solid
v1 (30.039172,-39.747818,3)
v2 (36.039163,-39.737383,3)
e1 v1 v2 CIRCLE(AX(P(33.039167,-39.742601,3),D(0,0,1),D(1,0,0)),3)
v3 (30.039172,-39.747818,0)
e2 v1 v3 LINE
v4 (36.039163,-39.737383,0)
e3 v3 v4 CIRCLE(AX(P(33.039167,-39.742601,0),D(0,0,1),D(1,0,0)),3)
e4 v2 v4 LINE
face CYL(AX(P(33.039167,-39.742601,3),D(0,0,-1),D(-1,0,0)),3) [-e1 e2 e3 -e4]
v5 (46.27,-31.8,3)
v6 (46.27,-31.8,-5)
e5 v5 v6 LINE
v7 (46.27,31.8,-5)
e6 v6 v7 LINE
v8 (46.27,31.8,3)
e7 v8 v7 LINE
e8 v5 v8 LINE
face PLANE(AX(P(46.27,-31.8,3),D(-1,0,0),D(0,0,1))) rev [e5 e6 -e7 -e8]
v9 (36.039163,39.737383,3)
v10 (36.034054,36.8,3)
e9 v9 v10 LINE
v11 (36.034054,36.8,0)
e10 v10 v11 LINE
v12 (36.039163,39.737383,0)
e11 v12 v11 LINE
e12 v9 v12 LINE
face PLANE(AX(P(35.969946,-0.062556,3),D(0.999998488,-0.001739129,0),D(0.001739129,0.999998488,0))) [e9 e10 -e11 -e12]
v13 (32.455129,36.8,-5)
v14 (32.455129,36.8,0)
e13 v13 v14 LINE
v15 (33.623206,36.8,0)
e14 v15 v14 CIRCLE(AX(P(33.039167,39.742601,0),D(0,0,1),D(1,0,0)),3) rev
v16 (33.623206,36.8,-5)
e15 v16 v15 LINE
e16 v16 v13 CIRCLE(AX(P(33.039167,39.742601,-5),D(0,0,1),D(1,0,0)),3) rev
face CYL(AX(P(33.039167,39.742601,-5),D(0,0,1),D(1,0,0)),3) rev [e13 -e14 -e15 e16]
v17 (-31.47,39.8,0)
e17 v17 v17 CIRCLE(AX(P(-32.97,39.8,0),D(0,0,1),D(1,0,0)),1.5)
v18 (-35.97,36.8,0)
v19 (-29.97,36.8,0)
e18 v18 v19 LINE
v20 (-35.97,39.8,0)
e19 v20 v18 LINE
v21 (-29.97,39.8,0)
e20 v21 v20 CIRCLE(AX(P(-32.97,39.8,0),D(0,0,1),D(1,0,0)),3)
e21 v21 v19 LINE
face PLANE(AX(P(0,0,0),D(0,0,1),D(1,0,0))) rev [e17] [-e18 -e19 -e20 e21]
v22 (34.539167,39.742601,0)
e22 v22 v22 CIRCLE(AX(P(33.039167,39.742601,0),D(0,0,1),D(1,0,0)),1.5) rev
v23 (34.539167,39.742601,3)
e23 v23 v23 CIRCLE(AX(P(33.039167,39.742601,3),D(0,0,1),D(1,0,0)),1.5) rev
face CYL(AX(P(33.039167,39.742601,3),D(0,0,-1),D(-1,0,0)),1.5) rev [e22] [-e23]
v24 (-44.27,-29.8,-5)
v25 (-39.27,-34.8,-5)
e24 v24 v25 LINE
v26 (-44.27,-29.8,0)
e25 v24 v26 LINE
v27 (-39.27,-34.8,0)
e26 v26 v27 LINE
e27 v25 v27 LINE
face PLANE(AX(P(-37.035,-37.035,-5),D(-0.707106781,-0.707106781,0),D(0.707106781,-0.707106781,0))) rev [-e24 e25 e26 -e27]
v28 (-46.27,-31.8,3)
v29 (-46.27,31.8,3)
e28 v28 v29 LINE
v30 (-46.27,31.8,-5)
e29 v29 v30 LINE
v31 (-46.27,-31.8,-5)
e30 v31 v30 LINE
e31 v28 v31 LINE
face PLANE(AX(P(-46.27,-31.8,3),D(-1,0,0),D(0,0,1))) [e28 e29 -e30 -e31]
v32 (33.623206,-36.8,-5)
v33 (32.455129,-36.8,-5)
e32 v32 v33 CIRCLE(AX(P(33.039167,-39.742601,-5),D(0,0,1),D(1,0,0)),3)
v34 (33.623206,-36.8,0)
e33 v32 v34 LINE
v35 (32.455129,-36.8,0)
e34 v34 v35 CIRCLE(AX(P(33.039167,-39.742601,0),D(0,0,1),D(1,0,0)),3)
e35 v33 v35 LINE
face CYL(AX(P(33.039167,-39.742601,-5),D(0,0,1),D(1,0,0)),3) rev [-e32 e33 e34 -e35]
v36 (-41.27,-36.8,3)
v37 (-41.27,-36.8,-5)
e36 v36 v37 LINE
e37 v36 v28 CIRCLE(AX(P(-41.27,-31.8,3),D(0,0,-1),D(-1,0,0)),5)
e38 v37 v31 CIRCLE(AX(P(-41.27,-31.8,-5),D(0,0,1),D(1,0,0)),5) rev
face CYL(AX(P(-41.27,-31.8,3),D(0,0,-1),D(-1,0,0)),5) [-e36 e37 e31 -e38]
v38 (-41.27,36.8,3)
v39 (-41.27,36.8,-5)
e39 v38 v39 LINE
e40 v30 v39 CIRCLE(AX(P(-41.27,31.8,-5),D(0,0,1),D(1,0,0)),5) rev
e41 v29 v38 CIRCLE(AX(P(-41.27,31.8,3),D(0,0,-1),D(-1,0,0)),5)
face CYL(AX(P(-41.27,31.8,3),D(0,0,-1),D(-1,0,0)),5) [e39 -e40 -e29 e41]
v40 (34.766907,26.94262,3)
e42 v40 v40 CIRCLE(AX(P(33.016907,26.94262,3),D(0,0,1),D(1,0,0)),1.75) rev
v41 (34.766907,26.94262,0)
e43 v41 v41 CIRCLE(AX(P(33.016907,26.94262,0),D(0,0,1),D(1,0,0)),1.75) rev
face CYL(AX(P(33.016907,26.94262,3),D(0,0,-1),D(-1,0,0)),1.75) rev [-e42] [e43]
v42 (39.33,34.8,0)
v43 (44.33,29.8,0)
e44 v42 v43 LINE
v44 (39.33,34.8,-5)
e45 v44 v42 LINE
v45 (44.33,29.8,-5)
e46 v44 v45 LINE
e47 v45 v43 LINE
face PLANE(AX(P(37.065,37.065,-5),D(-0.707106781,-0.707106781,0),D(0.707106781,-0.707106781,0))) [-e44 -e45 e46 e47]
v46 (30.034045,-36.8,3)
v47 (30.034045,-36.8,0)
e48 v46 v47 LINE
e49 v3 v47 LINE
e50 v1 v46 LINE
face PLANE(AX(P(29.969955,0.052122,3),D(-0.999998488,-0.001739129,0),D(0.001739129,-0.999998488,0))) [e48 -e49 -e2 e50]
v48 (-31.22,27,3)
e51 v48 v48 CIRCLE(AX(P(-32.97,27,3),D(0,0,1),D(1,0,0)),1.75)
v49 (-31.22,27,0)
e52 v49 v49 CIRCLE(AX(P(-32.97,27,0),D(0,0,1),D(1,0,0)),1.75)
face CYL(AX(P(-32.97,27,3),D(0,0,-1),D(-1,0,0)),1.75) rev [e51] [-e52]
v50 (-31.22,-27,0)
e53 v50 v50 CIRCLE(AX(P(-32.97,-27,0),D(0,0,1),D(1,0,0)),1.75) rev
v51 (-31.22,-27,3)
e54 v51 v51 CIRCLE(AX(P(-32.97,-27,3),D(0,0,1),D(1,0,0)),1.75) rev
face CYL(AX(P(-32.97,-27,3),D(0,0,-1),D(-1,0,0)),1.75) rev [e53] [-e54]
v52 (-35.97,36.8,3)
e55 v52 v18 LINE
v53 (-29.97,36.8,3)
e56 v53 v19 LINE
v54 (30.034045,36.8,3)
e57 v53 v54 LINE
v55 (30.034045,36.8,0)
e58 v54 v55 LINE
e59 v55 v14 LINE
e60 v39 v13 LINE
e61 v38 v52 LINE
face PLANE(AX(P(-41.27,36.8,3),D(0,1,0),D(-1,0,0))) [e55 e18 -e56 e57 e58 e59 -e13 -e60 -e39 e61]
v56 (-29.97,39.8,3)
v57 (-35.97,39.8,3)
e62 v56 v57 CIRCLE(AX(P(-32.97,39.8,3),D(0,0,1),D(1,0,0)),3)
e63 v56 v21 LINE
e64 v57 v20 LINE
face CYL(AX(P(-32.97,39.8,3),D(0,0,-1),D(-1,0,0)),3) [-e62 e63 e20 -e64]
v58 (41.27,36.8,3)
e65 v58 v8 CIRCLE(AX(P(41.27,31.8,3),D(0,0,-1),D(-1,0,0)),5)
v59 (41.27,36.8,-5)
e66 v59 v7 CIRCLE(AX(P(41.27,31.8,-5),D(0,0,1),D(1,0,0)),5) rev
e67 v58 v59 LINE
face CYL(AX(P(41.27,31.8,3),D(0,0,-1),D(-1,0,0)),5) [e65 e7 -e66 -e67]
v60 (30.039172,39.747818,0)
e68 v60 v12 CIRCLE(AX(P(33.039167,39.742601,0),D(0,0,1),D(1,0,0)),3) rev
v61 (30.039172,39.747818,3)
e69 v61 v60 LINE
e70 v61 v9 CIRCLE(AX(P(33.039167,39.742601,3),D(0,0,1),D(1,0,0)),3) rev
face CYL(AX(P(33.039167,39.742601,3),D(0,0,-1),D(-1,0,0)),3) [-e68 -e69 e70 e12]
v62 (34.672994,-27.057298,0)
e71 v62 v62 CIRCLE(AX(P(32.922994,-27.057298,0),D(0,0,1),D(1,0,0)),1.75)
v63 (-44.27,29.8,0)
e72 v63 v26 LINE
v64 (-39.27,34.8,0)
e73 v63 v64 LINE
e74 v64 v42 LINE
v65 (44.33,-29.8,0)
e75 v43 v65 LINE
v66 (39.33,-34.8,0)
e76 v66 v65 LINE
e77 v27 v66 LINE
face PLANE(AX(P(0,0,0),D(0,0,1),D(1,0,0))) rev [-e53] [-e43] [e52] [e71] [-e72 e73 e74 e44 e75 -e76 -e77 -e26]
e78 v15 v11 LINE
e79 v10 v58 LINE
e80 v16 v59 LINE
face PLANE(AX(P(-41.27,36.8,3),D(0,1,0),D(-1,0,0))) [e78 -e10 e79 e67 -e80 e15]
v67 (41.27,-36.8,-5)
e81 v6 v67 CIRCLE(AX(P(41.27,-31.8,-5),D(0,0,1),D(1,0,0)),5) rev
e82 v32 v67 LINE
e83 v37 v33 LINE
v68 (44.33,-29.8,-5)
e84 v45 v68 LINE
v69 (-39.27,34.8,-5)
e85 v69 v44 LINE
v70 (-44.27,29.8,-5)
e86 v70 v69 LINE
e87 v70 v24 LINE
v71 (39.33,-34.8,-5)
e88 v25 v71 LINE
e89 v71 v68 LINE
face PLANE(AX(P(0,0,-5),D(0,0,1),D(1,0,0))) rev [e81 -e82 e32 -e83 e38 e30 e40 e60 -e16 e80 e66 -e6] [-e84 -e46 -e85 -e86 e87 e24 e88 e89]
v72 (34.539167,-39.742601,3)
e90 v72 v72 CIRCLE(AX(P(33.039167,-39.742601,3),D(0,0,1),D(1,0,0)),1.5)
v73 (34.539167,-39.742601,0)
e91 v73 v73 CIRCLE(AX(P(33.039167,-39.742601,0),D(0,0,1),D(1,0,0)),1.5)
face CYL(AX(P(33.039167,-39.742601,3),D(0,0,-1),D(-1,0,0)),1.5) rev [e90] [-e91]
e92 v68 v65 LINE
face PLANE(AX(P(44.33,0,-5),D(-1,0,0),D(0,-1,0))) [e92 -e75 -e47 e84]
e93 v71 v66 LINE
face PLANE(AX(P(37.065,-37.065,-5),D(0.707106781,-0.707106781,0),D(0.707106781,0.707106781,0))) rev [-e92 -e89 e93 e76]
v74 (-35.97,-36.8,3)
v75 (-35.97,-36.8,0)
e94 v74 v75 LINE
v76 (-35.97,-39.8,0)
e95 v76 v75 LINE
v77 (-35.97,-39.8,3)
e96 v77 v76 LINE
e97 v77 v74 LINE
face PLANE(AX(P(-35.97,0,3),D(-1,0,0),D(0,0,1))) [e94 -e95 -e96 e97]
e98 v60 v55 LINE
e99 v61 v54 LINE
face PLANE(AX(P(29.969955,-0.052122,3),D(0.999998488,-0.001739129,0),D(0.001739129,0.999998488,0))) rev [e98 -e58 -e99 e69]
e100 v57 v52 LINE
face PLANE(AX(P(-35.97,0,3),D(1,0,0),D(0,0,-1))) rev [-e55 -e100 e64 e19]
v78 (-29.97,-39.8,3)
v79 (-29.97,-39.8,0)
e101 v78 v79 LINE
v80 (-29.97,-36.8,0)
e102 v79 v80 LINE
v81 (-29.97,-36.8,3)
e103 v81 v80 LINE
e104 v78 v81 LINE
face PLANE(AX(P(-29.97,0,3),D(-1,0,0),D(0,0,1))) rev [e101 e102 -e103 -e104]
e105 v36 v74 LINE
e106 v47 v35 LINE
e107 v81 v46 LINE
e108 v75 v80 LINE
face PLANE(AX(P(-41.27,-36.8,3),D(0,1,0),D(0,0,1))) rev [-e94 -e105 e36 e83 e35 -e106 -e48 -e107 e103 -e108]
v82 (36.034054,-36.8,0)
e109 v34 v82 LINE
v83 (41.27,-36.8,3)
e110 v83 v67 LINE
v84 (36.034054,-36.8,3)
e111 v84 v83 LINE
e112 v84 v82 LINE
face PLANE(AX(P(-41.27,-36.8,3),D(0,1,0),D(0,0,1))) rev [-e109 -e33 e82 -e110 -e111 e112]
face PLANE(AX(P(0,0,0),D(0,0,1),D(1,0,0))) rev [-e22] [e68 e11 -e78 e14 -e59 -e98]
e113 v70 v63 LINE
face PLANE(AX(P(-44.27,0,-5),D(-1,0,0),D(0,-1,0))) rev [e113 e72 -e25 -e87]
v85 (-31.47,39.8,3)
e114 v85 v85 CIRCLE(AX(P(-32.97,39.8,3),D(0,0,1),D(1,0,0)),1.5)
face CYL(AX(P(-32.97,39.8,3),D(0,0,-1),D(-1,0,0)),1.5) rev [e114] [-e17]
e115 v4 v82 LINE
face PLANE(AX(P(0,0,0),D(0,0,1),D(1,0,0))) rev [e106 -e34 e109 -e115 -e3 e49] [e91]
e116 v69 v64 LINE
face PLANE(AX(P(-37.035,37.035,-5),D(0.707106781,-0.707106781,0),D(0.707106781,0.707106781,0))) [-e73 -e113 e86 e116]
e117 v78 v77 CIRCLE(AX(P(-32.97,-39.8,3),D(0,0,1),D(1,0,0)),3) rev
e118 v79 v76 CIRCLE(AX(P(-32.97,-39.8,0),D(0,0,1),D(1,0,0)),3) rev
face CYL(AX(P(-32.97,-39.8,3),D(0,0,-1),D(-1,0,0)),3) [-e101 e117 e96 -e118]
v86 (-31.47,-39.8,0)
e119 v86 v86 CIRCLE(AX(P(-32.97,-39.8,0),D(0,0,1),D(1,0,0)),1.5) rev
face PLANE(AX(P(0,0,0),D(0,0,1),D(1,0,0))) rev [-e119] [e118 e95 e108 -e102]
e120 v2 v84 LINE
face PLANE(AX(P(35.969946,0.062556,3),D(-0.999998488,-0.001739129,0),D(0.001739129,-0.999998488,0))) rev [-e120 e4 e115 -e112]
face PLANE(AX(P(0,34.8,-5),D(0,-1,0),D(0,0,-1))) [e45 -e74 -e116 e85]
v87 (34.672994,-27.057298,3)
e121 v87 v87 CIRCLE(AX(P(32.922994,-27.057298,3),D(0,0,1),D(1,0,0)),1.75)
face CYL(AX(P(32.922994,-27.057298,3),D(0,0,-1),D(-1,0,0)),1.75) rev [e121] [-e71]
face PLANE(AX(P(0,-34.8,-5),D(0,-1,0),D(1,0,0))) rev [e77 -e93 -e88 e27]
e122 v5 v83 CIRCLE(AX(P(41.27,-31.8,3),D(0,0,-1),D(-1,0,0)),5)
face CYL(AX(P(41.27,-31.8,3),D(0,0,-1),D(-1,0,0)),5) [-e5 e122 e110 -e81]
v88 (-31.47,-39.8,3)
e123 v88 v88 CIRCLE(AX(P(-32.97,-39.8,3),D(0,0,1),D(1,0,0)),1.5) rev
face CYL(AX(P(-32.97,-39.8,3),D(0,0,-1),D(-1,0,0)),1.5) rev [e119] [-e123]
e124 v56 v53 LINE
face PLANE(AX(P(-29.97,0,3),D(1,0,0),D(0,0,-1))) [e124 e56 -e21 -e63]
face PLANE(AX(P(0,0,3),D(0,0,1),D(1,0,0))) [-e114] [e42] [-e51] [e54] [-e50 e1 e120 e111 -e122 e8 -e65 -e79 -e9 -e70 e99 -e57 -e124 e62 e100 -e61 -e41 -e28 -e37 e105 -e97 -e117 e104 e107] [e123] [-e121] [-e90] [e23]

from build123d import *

# Parameters (mm, degrees)
DRAFT_2_R           = 1.5
EXTRUDE_1_DEPTH     = 3
EXTRUDE_START       = -5
EXTRUDE_2_DEPTH     = 5
DRAFT_6_R           = 1.75
CUT_EXTRUDE_7_DEPTH = 64.227785822


with BuildPart() as part:
    # draft 2 → Extrude 1 (new body)
    with BuildSketch(Plane.XY):
        with BuildLine():
            Line((41.27, 36.8), (36.034054446, 36.8))
            Line((36.034054446, 36.8), (36.039162942, 39.737383337))
            ThreePointArc((36.039162942, 39.737383337), (33.044384867, 42.742596187), (30.039172016, 39.747818111))
            Line((30.039172016, 39.747818111), (30.034045372, 36.8))
            Line((30.034045372, 36.8), (-29.97, 36.8))
            Line((-29.97, 36.8), (-29.97, 39.8))
            ThreePointArc((-29.97, 39.8), (-32.97, 42.8), (-35.97, 39.8))
            Line((-35.97, 39.8), (-35.97, 36.8))
            Line((-35.97, 36.8), (-41.27, 36.8))
            ThreePointArc((-41.27, 36.8), (-44.805533906, 35.335533906), (-46.27, 31.8))
            Line((-46.27, 31.8), (-46.27, -31.8))
            ThreePointArc((-46.27, -31.8), (-44.805533906, -35.335533906), (-41.27, -36.8))
            Line((-41.27, -36.8), (-35.97, -36.8))
            Line((-35.97, -36.8), (-35.97, -39.8))
            ThreePointArc((-35.97, -39.8), (-32.97, -42.8), (-29.97, -39.8))
            Line((-29.97, -39.8), (-29.97, -36.8))
            Line((-29.97, -36.8), (30.034045372, -36.8))
            Line((30.034045372, -36.8), (30.039172016, -39.747818111))
            ThreePointArc((30.039172016, -39.747818111), (33.044384867, -42.742596187), (36.039162942, -39.737383337))
            Line((36.039162942, -39.737383337), (36.034054446, -36.8))
            Line((36.034054446, -36.8), (41.27, -36.8))
            ThreePointArc((41.27, -36.8), (44.805533906, -35.335533906), (46.27, -31.8))
            Line((46.27, -31.8), (46.27, 31.8))
            ThreePointArc((46.27, 31.8), (44.805533906, 35.335533906), (41.27, 36.8))
        make_face()
        with Locations((-32.97, -39.8)):
            Circle(DRAFT_2_R, mode=Mode.SUBTRACT)
        with Locations((33.039167479, -39.742600724)):
            Circle(DRAFT_2_R, mode=Mode.SUBTRACT)
        with Locations((-32.97, 39.8)):
            Circle(DRAFT_2_R, mode=Mode.SUBTRACT)
        with Locations((33.039167479, 39.742600724)):
            Circle(DRAFT_2_R, mode=Mode.SUBTRACT)
    extrude(amount=EXTRUDE_1_DEPTH)

    # draft_5 → Extrude 2 (add)
    with BuildSketch(Plane.XY.offset(EXTRUDE_START)):
        with BuildLine():
            ThreePointArc((-46.27, -31.8), (-44.805533906, -35.335533906), (-41.27, -36.8))
            Line((-41.27, -36.8), (-35.97, -36.8))
            Line((-35.97, -36.8), (-32.97, -36.8))
            Line((-32.97, -36.8), (-29.97, -36.8))
            Line((-29.97, -36.8), (30.034045372, -36.8))
            Line((30.034045372, -36.8), (32.455128971, -36.8))
            ThreePointArc((32.455128971, -36.8), (33.039167479, -36.742600724), (33.623205988, -36.8))
            Line((33.623205988, -36.8), (36.034054446, -36.8))
            Line((36.034054446, -36.8), (41.27, -36.8))
            ThreePointArc((41.27, -36.8), (44.805533906, -35.335533906), (46.27, -31.8))
            Line((46.27, -31.8), (46.27, 31.8))
            ThreePointArc((46.27, 31.8), (44.805533906, 35.335533906), (41.27, 36.8))
            Line((41.27, 36.8), (36.034054446, 36.8))
            Line((36.034054446, 36.8), (33.623205988, 36.8))
            ThreePointArc((33.623205988, 36.8), (33.039167479, 36.742600724), (32.455128971, 36.8))
            Line((32.455128971, 36.8), (30.034045372, 36.8))
            Line((30.034045372, 36.8), (-29.97, 36.8))
            Line((-29.97, 36.8), (-32.97, 36.8))
            Line((-32.97, 36.8), (-35.97, 36.8))
            Line((-35.97, 36.8), (-41.27, 36.8))
            ThreePointArc((-41.27, 36.8), (-44.805533906, 35.335533906), (-46.27, 31.8))
            Line((-46.27, 31.8), (-46.27, -31.8))
        make_face()
        Polygon((-44.27, 29.8), (-39.27, 34.8), (39.33, 34.8), (44.33, 29.8), (44.33, -29.8), (39.33, -34.8), (-39.27, -34.8), (-44.27, -29.8), align=None, mode=Mode.SUBTRACT)
    extrude(amount=EXTRUDE_2_DEPTH)

    # draft_6 → Cut-Extrude 7 (cut, through all)
    with BuildSketch(Plane.XY):
        with Locations((-32.97, 27)):
            Circle(DRAFT_6_R)
        with Locations((-32.97, -27)):
            Circle(DRAFT_6_R)
        with Locations((32.922993654, -27.057298255)):
            Circle(DRAFT_6_R)
        with Locations((33.016906626, 26.942620081)):
            Circle(DRAFT_6_R)
    extrude(amount=CUT_EXTRUDE_7_DEPTH, mode=Mode.SUBTRACT)


solid = part.part
